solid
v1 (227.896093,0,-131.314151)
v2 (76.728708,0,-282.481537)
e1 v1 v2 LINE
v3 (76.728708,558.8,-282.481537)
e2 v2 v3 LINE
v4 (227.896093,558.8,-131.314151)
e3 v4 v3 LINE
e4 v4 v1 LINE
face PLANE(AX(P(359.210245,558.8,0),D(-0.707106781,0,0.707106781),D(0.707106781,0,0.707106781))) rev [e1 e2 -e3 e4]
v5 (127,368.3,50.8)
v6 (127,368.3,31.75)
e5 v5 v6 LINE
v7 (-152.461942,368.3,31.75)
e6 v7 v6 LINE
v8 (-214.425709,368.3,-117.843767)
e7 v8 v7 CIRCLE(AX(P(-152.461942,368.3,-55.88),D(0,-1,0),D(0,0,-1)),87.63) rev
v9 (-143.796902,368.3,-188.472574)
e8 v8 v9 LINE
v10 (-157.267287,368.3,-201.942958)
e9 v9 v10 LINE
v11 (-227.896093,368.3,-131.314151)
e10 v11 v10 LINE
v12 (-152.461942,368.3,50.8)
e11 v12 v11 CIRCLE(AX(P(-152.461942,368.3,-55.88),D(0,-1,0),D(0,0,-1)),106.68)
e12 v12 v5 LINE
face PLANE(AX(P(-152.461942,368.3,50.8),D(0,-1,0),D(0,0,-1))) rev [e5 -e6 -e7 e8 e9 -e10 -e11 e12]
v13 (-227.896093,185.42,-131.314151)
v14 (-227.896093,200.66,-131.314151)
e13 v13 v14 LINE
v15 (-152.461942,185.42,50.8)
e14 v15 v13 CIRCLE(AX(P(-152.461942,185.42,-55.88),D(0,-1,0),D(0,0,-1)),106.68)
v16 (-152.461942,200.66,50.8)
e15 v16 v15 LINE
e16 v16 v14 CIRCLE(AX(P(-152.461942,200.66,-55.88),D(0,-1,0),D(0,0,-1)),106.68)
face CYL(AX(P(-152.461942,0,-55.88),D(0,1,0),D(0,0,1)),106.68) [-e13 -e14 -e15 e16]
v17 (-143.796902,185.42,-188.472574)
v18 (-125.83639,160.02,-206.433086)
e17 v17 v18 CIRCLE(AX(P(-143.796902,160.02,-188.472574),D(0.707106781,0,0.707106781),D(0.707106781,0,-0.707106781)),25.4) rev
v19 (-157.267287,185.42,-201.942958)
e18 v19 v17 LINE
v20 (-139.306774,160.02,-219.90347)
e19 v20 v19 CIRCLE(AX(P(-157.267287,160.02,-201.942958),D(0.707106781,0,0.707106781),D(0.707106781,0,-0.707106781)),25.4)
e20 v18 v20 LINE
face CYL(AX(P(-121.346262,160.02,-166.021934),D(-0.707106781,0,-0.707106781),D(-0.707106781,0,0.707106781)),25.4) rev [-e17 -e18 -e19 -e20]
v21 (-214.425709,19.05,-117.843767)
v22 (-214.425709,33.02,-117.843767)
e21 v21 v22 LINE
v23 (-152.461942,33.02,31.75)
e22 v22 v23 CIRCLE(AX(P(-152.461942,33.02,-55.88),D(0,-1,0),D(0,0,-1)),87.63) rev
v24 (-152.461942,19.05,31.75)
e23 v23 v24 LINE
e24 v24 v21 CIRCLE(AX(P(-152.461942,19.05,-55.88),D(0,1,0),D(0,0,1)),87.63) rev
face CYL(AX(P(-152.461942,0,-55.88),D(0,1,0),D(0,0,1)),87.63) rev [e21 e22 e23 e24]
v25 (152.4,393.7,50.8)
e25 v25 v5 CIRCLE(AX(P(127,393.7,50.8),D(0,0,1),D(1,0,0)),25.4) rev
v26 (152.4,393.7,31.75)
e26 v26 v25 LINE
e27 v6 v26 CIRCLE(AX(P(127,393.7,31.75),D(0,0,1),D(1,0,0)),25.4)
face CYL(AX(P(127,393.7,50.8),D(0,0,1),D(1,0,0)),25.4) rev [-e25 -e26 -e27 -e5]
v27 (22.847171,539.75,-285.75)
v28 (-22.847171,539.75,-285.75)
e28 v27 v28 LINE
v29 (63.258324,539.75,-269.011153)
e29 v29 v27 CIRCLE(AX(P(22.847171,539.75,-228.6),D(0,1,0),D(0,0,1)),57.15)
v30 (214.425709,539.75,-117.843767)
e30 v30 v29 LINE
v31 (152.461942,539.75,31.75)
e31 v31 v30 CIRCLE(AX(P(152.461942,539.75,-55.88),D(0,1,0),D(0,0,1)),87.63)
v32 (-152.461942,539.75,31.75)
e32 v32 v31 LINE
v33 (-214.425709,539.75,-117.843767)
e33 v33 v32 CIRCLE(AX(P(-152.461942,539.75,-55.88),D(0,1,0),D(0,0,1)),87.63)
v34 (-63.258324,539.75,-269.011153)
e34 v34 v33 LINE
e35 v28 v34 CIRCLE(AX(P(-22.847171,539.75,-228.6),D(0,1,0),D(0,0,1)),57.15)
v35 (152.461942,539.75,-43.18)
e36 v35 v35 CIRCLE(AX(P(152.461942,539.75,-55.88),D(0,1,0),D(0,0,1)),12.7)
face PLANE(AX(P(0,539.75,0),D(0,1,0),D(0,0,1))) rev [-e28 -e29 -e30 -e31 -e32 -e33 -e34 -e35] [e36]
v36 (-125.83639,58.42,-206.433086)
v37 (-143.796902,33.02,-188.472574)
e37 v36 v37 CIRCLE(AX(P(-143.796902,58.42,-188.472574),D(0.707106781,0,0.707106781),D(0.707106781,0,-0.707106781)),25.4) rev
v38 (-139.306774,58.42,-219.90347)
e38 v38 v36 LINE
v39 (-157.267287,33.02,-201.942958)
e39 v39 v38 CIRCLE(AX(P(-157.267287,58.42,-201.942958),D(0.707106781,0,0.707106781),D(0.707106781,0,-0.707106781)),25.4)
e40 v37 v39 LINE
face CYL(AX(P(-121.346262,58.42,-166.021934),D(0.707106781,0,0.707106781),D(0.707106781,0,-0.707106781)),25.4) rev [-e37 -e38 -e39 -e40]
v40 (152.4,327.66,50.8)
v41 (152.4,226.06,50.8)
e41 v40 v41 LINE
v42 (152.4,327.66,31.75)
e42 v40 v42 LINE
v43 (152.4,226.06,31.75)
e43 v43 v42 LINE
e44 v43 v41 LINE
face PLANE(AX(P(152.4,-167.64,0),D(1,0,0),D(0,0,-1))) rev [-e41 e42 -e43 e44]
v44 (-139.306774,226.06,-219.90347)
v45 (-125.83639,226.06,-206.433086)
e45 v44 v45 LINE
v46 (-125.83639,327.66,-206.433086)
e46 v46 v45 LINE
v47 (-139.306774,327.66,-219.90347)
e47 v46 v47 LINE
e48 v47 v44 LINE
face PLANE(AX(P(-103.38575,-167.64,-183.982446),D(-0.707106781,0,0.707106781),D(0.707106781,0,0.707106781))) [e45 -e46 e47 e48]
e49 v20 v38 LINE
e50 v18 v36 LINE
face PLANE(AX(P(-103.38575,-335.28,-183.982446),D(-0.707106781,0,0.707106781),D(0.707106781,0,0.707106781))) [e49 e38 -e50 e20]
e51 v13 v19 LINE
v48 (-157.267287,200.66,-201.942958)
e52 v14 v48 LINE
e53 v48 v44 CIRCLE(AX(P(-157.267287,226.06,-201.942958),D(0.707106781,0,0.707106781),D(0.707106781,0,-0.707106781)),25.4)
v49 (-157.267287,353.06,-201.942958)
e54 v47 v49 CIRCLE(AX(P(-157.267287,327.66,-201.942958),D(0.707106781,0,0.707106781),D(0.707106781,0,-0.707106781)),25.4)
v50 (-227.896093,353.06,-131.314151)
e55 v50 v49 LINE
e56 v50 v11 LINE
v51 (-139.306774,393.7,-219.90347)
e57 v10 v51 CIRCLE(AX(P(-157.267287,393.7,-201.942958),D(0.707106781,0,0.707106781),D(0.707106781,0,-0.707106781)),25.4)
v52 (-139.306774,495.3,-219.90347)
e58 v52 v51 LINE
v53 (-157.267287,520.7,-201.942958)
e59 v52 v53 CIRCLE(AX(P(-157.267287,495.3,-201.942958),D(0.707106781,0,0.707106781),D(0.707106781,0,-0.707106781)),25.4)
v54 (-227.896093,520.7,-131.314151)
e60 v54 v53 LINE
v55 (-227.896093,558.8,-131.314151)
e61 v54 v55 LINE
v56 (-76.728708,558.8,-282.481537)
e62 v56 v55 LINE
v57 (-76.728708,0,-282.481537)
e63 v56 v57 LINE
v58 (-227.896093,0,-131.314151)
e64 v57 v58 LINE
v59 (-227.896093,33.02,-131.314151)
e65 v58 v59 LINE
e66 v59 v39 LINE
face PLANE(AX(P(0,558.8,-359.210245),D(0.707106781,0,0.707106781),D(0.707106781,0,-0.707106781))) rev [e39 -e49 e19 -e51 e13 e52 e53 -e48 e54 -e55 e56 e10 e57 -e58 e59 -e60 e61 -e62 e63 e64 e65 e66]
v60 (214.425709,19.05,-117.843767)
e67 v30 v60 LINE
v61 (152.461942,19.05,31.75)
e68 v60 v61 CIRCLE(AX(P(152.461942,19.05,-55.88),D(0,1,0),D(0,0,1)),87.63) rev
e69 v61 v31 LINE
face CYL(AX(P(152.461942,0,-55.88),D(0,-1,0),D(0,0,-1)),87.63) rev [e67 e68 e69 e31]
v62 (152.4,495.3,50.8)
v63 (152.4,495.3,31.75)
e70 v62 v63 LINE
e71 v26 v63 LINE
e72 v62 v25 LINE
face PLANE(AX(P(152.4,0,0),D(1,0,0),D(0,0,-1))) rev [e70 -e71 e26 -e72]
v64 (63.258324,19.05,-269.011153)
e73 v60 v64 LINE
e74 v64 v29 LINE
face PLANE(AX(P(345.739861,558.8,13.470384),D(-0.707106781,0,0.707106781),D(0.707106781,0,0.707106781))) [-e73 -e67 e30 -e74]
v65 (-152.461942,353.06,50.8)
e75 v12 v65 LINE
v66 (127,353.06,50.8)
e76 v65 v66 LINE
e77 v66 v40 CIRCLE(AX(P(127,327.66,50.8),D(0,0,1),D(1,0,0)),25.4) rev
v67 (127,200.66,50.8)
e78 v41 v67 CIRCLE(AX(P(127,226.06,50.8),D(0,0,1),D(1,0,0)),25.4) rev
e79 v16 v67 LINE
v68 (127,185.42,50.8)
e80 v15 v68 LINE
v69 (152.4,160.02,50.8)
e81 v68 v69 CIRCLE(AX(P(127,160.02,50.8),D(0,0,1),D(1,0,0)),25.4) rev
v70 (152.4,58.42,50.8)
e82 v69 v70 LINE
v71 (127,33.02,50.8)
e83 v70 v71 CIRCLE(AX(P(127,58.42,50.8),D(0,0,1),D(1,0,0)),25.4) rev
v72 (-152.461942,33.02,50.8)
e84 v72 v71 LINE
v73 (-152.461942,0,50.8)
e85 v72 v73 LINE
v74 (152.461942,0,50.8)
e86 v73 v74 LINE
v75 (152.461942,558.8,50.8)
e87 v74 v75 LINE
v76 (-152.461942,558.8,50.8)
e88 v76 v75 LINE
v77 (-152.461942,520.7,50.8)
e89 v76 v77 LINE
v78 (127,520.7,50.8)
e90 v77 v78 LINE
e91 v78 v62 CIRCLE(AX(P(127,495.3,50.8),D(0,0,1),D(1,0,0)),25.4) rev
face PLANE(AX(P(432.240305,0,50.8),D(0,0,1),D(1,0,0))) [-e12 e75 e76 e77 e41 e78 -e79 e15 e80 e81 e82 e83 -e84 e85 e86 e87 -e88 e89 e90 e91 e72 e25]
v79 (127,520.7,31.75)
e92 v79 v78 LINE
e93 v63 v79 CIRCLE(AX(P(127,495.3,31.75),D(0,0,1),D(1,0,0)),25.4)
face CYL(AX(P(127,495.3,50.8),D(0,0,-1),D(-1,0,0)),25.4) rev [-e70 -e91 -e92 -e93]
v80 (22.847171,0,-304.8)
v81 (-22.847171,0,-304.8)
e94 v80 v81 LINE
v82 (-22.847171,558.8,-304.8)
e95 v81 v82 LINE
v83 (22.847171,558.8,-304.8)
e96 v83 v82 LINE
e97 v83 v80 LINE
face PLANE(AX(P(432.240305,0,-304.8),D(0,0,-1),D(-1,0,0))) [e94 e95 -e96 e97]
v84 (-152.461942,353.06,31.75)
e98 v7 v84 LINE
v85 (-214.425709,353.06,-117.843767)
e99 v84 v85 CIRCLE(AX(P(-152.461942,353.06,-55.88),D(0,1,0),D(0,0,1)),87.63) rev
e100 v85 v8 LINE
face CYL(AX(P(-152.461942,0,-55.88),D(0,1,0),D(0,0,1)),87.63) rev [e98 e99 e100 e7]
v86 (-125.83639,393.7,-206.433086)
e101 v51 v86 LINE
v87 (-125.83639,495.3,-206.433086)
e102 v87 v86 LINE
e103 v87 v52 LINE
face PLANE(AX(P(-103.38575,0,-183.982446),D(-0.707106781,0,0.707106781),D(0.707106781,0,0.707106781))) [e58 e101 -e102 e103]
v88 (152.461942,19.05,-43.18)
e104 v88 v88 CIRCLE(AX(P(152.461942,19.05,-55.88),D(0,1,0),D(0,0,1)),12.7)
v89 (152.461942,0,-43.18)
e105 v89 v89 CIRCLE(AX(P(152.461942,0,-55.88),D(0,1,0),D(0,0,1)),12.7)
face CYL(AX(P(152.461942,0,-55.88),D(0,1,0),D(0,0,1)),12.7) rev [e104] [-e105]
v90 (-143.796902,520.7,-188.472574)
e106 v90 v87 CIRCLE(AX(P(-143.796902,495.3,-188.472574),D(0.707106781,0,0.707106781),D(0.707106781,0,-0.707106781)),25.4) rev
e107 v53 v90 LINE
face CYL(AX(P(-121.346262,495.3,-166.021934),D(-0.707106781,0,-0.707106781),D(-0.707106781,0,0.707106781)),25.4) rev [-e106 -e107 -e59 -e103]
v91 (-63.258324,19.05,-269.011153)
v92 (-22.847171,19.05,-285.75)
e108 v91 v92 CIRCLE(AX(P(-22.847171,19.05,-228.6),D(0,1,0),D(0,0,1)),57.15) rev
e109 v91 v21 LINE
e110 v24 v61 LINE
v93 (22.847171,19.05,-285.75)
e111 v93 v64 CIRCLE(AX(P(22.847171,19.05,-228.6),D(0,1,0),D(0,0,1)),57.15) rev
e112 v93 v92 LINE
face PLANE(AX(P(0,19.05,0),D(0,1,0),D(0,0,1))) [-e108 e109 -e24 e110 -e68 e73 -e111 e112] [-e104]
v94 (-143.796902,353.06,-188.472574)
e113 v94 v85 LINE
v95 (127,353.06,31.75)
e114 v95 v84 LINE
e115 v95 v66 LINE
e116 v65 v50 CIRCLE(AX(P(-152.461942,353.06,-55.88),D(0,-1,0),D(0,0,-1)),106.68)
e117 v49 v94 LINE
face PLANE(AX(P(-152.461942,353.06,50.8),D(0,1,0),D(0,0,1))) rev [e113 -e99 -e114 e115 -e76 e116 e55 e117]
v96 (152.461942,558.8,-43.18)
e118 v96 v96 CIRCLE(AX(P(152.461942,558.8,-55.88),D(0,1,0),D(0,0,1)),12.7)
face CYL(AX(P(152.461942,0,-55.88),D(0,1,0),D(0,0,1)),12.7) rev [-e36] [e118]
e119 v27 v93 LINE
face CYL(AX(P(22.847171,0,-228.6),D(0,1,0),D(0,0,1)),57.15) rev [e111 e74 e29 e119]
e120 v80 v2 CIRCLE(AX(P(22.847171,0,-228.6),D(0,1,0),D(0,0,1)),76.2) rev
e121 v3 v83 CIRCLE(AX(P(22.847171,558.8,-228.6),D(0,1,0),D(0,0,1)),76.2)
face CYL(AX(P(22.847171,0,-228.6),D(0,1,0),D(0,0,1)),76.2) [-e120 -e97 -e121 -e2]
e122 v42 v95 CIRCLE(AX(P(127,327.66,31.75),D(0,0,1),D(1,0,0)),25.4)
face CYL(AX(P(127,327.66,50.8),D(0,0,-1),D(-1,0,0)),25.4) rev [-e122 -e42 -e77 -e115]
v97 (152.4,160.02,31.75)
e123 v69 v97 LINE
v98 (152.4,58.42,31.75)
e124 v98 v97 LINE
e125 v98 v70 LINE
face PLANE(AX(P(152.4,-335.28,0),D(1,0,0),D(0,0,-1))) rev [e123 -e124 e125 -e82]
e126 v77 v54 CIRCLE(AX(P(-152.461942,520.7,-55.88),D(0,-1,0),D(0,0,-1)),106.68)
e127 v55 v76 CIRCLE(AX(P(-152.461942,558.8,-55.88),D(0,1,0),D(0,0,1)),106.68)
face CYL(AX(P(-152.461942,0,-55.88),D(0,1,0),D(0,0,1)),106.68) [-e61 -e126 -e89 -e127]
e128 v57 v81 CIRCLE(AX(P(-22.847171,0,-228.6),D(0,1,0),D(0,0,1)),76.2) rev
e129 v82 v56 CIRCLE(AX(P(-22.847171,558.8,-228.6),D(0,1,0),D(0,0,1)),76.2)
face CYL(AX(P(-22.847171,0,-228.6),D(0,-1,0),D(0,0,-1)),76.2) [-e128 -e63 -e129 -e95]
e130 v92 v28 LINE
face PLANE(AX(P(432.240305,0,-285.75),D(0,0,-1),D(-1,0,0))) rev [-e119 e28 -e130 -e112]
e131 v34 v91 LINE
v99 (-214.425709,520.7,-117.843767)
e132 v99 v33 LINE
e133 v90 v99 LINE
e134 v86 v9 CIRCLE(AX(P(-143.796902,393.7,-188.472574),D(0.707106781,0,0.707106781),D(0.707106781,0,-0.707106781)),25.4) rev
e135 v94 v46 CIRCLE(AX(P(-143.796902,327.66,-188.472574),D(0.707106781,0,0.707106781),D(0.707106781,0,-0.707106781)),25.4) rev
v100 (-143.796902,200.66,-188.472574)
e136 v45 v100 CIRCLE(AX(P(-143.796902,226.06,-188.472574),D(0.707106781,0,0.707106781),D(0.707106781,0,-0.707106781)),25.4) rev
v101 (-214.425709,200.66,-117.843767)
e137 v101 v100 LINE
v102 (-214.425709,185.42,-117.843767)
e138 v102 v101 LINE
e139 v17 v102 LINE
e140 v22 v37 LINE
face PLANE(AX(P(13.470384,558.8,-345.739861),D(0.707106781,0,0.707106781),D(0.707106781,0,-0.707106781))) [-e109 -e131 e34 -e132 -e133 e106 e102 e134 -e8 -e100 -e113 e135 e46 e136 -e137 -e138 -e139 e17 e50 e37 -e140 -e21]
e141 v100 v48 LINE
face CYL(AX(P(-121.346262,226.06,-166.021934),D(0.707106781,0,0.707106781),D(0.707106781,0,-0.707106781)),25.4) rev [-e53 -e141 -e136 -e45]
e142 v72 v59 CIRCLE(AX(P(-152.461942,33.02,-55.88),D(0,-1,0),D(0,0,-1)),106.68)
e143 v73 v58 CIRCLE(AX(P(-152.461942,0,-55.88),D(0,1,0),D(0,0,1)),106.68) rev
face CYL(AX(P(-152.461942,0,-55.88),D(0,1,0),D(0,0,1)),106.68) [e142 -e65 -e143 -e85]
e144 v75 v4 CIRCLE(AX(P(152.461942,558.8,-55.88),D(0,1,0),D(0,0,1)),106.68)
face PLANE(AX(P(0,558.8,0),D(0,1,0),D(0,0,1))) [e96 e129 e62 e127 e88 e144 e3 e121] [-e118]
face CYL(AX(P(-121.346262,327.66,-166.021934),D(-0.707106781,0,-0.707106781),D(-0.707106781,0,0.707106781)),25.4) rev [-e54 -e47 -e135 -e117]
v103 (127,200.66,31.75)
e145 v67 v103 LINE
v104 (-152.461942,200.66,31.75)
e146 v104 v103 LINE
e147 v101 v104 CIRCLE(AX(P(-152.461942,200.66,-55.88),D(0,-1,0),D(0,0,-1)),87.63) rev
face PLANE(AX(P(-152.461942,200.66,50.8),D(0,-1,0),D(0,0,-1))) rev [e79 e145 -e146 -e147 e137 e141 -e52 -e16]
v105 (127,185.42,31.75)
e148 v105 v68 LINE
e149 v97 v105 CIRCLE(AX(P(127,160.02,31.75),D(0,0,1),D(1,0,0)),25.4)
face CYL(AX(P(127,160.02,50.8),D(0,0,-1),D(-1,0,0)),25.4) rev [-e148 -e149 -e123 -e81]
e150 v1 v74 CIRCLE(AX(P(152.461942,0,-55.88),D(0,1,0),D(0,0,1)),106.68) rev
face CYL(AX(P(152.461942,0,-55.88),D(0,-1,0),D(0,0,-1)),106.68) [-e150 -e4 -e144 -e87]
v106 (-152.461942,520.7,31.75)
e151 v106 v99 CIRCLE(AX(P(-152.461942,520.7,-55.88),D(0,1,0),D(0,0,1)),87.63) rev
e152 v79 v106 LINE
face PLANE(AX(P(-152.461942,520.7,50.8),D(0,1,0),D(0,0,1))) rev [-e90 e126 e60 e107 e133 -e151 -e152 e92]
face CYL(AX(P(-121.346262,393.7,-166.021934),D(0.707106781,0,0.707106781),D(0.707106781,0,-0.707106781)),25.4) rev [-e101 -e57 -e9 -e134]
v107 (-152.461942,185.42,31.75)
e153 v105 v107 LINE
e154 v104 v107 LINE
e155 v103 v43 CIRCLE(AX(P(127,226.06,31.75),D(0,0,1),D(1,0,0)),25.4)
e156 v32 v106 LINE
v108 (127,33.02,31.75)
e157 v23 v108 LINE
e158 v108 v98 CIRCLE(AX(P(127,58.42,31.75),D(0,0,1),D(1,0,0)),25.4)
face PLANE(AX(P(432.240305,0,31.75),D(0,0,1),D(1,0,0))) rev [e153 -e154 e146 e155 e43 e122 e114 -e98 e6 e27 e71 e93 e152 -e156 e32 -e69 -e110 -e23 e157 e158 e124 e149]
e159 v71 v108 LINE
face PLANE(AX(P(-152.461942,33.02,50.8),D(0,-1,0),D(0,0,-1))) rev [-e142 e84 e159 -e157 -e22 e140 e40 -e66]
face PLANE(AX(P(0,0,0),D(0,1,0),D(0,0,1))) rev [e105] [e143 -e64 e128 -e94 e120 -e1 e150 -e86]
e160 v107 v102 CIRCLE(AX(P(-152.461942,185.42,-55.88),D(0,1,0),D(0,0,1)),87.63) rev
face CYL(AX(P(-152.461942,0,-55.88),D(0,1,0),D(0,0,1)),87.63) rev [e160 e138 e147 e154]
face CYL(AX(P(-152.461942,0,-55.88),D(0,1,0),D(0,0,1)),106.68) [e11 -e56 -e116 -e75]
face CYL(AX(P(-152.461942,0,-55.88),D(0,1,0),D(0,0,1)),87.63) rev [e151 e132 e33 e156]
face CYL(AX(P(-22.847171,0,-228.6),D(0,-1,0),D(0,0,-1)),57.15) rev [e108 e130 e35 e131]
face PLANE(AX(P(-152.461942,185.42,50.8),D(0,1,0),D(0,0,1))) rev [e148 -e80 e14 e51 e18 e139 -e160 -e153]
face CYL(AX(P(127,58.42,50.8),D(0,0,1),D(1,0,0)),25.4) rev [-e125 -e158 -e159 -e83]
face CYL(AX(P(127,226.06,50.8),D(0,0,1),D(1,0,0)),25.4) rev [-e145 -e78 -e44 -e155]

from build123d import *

# Parameters (mm, degrees)
BOSS_EXTRUDE1_DEPTH    = 558.8
SKETCH2_W              = 1233.22752028
SKETCH2_H              = 1270
SKETCH2_W_2            = 864.480609306
SKETCH2_H_2            = 355.6
CUT_EXTRUDE1_DEPTH     = 756.196292364
FILLET1_R              = 213.36
FILLET2_R              = 76.2
FILLET5_R              = 106.68
SHELL1_T               = 19.05
SKETCH7_W              = 20.32
SKETCH7_H              = 152.4
SKETCH7_2_W            = 20.32
SKETCH7_2_H            = 152.4
CUT_EXTRUDE2_DEPTH     = 152.4
FILLET6_R              = 25.4
LPATTERN1_COUNT        = 3
LPATTERN1_PITCH        = 167.64
FILLET6_OF_LPATTERN1_R = 25.4
SKETCH10_R             = 12.7
CUT_EXTRUDE3_DEPTH     = 688.251792528


with BuildPart() as part:
    # Sketch1 → Boss-Extrude1 (new body)
    with BuildSketch(Plane(origin=(0, 0, 0), x_dir=(1, 0, 0), z_dir=(0, 1, 0))):
        Polygon((359.210244843, 0), (0, -359.210244843), (-359.210244843, 0), (0, 359.210244843), align=None)
    extrude(amount=BOSS_EXTRUDE1_DEPTH)

    # Sketch2 → Cut-Extrude1 (cut, through all)
    with BuildSketch(Plane(origin=(0, 558.8, 0), x_dir=(1, 0, 0), z_dir=(0, 1, 0))):
        with Locations((0, 127)):
            Rectangle(SKETCH2_W, SKETCH2_H)
        with Locations((0, 127)):
            Rectangle(SKETCH2_W_2, SKETCH2_H_2, mode=Mode.SUBTRACT)
    extrude(amount=-CUT_EXTRUDE1_DEPTH, mode=Mode.SUBTRACT)

    # Fillet1
    # the kernel refuses this fillet: 213.36 mm, written as the material it takes off along each edge
    with BuildSketch(Plane(origin=(359.210244843, -399.180090434, 0), x_dir=(-0.707106781186546, 0, 0.707106781186549), z_dir=(0, 1, 0))) as fillet1_piece_1:
        with BuildLine():
            CenterArc((213.36, -159.672036174), FILLET1_R, 131.550696865, 48.449303135)
            Line((0, -159.672036174), (-4.2672, -159.672036174))
            Line((-4.2672, -159.672036174), (-4.2672, 0))
            Line((-4.2672, 0), (0, 4.2672))
            ThreePointArc((0, 4.2672), (35.921024484, 4.2672), (69.011689948, 3.193440723))
            Line((69.011689948, 3.193440723), (71.842048969, 0))
        make_face()
    extrude(amount=1357.160180869, mode=Mode.SUBTRACT)
    with BuildSketch(Plane(origin=(-359.210244843, -399.180090434, 0), x_dir=(0.707106781186546, 0, -0.7071067811865489), z_dir=(0, 1, 0))) as fillet1_piece_2:
        with BuildLine():
            CenterArc((159.672036174, -213.36), FILLET1_R, 90, 48.449303135)
            Line((0, -71.842048969), (-3.193440723, -69.011689948))
            ThreePointArc((-3.193440723, -69.011689948), (-4.2672, -35.921024484), (-4.2672, 0))
            Line((-4.2672, 0), (0, 4.2672))
            Line((0, 4.2672), (159.672036174, 4.2672))
            Line((159.672036174, 4.2672), (159.672036174, 0))
        make_face()
    extrude(amount=1357.160180869, mode=Mode.SUBTRACT)

    # Fillet2
    fillet2_edges = [part.edges().sort_by_distance(p)[0] for p in [
        (54.410244843, 279.4, -304.8),
        (-54.410244843, 279.4, -304.8),
    ]]
    fillet(fillet2_edges, radius=FILLET2_R)

    # Fillet5
    fillet5_edges = [part.edges().sort_by_distance(p)[0] for p in [
        (308.410244843, 279.4, 50.8),
        (-308.410244843, 279.4, 50.8),
    ]]
    fillet(fillet5_edges, radius=FILLET5_R)

    # Shell1 (no face opened: a closed hollow body)
    add(offset(amount=-SHELL1_T, mode=Mode.PRIVATE), mode=Mode.SUBTRACT)

    # Cut-Sweep1: sweep along a path in Sketch8
    with BuildLine(Plane(origin=(0, 558.8, 0), x_dir=(1, 0, 0), z_dir=(0, 1, 0))) as cut_sweep1_path:
        Line((0, -50.8), (-152.461942009, -50.8))
        ThreePointArc((-152.461942009, -50.8), (-251.021410537, 15.055331435), (-227.896093426, 131.314151417))
        Line((-227.896093426, 131.314151417), (-139.3067744, 219.903470443))
    # Sketch7 → Cut-Sweep1 (sweep, cut)
    with BuildSketch(Plane(origin=(0, 0, 0), x_dir=(0, 0, -1), z_dir=(1, 0, 0))):
        with Locations((-40.64, 444.5)):
            Rectangle(SKETCH7_W, SKETCH7_H)
    cut_sweep1 = sweep(path=cut_sweep1_path.line, mode=Mode.SUBTRACT)

    # Sketch7<2> → Cut-Extrude2 (cut)
    with BuildSketch(Plane(origin=(0, 0, 0), x_dir=(0, 0, -1), z_dir=(1, 0, 0))):
        with Locations((-40.64, 444.5)):
            Rectangle(SKETCH7_2_W, SKETCH7_2_H)
    cut_extrude2 = extrude(amount=CUT_EXTRUDE2_DEPTH, mode=Mode.SUBTRACT)

    # Fillet6
    fillet6_edges = [part.edges().sort_by_distance(p)[0] for p in [
        (-132.571582309, 520.7, -213.168278352),
        (-132.571582309, 368.3, -213.168278352),
        (152.4, 368.3, 41.275),
        (152.4, 520.7, 41.275),
    ]]
    fillet(fillet6_edges, radius=FILLET6_R)

    # LPattern1: Cut-Sweep1, Cut-Extrude2 ×3
    with Locations(*[(0, -i * LPATTERN1_PITCH, 0) for i in range(1, LPATTERN1_COUNT)]):
        add(cut_sweep1, mode=Mode.SUBTRACT)
        add(cut_extrude2, mode=Mode.SUBTRACT)

    # Fillet6 of LPattern1
    fillet6_of_lpattern1_edges = [part.edges().sort_by_distance(p)[0] for p in [
        (-132.571582309, 353.06, -213.168278352),
        (-132.571582309, 200.66, -213.168278352),
        (152.4, 200.66, 41.275),
        (152.4, 353.06, 41.275),
        (-132.571582309, 185.42, -213.168278352),
        (-132.571582309, 33.02, -213.168278352),
        (152.4, 33.02, 41.275),
        (152.4, 185.42, 41.275),
    ]]
    fillet(fillet6_of_lpattern1_edges, radius=FILLET6_OF_LPATTERN1_R)

    # Sketch10 → Cut-Extrude3 (cut, through all)
    with BuildSketch(Plane(origin=(0, 558.8, 0), x_dir=(1, 0, 0), z_dir=(0, 1, 0))):
        with Locations(Location((152.461942009, 55.88, 0), (0, 0, 270))):
            Circle(SKETCH10_R)
    extrude(amount=-CUT_EXTRUDE3_DEPTH, mode=Mode.SUBTRACT)


solid = part.part
